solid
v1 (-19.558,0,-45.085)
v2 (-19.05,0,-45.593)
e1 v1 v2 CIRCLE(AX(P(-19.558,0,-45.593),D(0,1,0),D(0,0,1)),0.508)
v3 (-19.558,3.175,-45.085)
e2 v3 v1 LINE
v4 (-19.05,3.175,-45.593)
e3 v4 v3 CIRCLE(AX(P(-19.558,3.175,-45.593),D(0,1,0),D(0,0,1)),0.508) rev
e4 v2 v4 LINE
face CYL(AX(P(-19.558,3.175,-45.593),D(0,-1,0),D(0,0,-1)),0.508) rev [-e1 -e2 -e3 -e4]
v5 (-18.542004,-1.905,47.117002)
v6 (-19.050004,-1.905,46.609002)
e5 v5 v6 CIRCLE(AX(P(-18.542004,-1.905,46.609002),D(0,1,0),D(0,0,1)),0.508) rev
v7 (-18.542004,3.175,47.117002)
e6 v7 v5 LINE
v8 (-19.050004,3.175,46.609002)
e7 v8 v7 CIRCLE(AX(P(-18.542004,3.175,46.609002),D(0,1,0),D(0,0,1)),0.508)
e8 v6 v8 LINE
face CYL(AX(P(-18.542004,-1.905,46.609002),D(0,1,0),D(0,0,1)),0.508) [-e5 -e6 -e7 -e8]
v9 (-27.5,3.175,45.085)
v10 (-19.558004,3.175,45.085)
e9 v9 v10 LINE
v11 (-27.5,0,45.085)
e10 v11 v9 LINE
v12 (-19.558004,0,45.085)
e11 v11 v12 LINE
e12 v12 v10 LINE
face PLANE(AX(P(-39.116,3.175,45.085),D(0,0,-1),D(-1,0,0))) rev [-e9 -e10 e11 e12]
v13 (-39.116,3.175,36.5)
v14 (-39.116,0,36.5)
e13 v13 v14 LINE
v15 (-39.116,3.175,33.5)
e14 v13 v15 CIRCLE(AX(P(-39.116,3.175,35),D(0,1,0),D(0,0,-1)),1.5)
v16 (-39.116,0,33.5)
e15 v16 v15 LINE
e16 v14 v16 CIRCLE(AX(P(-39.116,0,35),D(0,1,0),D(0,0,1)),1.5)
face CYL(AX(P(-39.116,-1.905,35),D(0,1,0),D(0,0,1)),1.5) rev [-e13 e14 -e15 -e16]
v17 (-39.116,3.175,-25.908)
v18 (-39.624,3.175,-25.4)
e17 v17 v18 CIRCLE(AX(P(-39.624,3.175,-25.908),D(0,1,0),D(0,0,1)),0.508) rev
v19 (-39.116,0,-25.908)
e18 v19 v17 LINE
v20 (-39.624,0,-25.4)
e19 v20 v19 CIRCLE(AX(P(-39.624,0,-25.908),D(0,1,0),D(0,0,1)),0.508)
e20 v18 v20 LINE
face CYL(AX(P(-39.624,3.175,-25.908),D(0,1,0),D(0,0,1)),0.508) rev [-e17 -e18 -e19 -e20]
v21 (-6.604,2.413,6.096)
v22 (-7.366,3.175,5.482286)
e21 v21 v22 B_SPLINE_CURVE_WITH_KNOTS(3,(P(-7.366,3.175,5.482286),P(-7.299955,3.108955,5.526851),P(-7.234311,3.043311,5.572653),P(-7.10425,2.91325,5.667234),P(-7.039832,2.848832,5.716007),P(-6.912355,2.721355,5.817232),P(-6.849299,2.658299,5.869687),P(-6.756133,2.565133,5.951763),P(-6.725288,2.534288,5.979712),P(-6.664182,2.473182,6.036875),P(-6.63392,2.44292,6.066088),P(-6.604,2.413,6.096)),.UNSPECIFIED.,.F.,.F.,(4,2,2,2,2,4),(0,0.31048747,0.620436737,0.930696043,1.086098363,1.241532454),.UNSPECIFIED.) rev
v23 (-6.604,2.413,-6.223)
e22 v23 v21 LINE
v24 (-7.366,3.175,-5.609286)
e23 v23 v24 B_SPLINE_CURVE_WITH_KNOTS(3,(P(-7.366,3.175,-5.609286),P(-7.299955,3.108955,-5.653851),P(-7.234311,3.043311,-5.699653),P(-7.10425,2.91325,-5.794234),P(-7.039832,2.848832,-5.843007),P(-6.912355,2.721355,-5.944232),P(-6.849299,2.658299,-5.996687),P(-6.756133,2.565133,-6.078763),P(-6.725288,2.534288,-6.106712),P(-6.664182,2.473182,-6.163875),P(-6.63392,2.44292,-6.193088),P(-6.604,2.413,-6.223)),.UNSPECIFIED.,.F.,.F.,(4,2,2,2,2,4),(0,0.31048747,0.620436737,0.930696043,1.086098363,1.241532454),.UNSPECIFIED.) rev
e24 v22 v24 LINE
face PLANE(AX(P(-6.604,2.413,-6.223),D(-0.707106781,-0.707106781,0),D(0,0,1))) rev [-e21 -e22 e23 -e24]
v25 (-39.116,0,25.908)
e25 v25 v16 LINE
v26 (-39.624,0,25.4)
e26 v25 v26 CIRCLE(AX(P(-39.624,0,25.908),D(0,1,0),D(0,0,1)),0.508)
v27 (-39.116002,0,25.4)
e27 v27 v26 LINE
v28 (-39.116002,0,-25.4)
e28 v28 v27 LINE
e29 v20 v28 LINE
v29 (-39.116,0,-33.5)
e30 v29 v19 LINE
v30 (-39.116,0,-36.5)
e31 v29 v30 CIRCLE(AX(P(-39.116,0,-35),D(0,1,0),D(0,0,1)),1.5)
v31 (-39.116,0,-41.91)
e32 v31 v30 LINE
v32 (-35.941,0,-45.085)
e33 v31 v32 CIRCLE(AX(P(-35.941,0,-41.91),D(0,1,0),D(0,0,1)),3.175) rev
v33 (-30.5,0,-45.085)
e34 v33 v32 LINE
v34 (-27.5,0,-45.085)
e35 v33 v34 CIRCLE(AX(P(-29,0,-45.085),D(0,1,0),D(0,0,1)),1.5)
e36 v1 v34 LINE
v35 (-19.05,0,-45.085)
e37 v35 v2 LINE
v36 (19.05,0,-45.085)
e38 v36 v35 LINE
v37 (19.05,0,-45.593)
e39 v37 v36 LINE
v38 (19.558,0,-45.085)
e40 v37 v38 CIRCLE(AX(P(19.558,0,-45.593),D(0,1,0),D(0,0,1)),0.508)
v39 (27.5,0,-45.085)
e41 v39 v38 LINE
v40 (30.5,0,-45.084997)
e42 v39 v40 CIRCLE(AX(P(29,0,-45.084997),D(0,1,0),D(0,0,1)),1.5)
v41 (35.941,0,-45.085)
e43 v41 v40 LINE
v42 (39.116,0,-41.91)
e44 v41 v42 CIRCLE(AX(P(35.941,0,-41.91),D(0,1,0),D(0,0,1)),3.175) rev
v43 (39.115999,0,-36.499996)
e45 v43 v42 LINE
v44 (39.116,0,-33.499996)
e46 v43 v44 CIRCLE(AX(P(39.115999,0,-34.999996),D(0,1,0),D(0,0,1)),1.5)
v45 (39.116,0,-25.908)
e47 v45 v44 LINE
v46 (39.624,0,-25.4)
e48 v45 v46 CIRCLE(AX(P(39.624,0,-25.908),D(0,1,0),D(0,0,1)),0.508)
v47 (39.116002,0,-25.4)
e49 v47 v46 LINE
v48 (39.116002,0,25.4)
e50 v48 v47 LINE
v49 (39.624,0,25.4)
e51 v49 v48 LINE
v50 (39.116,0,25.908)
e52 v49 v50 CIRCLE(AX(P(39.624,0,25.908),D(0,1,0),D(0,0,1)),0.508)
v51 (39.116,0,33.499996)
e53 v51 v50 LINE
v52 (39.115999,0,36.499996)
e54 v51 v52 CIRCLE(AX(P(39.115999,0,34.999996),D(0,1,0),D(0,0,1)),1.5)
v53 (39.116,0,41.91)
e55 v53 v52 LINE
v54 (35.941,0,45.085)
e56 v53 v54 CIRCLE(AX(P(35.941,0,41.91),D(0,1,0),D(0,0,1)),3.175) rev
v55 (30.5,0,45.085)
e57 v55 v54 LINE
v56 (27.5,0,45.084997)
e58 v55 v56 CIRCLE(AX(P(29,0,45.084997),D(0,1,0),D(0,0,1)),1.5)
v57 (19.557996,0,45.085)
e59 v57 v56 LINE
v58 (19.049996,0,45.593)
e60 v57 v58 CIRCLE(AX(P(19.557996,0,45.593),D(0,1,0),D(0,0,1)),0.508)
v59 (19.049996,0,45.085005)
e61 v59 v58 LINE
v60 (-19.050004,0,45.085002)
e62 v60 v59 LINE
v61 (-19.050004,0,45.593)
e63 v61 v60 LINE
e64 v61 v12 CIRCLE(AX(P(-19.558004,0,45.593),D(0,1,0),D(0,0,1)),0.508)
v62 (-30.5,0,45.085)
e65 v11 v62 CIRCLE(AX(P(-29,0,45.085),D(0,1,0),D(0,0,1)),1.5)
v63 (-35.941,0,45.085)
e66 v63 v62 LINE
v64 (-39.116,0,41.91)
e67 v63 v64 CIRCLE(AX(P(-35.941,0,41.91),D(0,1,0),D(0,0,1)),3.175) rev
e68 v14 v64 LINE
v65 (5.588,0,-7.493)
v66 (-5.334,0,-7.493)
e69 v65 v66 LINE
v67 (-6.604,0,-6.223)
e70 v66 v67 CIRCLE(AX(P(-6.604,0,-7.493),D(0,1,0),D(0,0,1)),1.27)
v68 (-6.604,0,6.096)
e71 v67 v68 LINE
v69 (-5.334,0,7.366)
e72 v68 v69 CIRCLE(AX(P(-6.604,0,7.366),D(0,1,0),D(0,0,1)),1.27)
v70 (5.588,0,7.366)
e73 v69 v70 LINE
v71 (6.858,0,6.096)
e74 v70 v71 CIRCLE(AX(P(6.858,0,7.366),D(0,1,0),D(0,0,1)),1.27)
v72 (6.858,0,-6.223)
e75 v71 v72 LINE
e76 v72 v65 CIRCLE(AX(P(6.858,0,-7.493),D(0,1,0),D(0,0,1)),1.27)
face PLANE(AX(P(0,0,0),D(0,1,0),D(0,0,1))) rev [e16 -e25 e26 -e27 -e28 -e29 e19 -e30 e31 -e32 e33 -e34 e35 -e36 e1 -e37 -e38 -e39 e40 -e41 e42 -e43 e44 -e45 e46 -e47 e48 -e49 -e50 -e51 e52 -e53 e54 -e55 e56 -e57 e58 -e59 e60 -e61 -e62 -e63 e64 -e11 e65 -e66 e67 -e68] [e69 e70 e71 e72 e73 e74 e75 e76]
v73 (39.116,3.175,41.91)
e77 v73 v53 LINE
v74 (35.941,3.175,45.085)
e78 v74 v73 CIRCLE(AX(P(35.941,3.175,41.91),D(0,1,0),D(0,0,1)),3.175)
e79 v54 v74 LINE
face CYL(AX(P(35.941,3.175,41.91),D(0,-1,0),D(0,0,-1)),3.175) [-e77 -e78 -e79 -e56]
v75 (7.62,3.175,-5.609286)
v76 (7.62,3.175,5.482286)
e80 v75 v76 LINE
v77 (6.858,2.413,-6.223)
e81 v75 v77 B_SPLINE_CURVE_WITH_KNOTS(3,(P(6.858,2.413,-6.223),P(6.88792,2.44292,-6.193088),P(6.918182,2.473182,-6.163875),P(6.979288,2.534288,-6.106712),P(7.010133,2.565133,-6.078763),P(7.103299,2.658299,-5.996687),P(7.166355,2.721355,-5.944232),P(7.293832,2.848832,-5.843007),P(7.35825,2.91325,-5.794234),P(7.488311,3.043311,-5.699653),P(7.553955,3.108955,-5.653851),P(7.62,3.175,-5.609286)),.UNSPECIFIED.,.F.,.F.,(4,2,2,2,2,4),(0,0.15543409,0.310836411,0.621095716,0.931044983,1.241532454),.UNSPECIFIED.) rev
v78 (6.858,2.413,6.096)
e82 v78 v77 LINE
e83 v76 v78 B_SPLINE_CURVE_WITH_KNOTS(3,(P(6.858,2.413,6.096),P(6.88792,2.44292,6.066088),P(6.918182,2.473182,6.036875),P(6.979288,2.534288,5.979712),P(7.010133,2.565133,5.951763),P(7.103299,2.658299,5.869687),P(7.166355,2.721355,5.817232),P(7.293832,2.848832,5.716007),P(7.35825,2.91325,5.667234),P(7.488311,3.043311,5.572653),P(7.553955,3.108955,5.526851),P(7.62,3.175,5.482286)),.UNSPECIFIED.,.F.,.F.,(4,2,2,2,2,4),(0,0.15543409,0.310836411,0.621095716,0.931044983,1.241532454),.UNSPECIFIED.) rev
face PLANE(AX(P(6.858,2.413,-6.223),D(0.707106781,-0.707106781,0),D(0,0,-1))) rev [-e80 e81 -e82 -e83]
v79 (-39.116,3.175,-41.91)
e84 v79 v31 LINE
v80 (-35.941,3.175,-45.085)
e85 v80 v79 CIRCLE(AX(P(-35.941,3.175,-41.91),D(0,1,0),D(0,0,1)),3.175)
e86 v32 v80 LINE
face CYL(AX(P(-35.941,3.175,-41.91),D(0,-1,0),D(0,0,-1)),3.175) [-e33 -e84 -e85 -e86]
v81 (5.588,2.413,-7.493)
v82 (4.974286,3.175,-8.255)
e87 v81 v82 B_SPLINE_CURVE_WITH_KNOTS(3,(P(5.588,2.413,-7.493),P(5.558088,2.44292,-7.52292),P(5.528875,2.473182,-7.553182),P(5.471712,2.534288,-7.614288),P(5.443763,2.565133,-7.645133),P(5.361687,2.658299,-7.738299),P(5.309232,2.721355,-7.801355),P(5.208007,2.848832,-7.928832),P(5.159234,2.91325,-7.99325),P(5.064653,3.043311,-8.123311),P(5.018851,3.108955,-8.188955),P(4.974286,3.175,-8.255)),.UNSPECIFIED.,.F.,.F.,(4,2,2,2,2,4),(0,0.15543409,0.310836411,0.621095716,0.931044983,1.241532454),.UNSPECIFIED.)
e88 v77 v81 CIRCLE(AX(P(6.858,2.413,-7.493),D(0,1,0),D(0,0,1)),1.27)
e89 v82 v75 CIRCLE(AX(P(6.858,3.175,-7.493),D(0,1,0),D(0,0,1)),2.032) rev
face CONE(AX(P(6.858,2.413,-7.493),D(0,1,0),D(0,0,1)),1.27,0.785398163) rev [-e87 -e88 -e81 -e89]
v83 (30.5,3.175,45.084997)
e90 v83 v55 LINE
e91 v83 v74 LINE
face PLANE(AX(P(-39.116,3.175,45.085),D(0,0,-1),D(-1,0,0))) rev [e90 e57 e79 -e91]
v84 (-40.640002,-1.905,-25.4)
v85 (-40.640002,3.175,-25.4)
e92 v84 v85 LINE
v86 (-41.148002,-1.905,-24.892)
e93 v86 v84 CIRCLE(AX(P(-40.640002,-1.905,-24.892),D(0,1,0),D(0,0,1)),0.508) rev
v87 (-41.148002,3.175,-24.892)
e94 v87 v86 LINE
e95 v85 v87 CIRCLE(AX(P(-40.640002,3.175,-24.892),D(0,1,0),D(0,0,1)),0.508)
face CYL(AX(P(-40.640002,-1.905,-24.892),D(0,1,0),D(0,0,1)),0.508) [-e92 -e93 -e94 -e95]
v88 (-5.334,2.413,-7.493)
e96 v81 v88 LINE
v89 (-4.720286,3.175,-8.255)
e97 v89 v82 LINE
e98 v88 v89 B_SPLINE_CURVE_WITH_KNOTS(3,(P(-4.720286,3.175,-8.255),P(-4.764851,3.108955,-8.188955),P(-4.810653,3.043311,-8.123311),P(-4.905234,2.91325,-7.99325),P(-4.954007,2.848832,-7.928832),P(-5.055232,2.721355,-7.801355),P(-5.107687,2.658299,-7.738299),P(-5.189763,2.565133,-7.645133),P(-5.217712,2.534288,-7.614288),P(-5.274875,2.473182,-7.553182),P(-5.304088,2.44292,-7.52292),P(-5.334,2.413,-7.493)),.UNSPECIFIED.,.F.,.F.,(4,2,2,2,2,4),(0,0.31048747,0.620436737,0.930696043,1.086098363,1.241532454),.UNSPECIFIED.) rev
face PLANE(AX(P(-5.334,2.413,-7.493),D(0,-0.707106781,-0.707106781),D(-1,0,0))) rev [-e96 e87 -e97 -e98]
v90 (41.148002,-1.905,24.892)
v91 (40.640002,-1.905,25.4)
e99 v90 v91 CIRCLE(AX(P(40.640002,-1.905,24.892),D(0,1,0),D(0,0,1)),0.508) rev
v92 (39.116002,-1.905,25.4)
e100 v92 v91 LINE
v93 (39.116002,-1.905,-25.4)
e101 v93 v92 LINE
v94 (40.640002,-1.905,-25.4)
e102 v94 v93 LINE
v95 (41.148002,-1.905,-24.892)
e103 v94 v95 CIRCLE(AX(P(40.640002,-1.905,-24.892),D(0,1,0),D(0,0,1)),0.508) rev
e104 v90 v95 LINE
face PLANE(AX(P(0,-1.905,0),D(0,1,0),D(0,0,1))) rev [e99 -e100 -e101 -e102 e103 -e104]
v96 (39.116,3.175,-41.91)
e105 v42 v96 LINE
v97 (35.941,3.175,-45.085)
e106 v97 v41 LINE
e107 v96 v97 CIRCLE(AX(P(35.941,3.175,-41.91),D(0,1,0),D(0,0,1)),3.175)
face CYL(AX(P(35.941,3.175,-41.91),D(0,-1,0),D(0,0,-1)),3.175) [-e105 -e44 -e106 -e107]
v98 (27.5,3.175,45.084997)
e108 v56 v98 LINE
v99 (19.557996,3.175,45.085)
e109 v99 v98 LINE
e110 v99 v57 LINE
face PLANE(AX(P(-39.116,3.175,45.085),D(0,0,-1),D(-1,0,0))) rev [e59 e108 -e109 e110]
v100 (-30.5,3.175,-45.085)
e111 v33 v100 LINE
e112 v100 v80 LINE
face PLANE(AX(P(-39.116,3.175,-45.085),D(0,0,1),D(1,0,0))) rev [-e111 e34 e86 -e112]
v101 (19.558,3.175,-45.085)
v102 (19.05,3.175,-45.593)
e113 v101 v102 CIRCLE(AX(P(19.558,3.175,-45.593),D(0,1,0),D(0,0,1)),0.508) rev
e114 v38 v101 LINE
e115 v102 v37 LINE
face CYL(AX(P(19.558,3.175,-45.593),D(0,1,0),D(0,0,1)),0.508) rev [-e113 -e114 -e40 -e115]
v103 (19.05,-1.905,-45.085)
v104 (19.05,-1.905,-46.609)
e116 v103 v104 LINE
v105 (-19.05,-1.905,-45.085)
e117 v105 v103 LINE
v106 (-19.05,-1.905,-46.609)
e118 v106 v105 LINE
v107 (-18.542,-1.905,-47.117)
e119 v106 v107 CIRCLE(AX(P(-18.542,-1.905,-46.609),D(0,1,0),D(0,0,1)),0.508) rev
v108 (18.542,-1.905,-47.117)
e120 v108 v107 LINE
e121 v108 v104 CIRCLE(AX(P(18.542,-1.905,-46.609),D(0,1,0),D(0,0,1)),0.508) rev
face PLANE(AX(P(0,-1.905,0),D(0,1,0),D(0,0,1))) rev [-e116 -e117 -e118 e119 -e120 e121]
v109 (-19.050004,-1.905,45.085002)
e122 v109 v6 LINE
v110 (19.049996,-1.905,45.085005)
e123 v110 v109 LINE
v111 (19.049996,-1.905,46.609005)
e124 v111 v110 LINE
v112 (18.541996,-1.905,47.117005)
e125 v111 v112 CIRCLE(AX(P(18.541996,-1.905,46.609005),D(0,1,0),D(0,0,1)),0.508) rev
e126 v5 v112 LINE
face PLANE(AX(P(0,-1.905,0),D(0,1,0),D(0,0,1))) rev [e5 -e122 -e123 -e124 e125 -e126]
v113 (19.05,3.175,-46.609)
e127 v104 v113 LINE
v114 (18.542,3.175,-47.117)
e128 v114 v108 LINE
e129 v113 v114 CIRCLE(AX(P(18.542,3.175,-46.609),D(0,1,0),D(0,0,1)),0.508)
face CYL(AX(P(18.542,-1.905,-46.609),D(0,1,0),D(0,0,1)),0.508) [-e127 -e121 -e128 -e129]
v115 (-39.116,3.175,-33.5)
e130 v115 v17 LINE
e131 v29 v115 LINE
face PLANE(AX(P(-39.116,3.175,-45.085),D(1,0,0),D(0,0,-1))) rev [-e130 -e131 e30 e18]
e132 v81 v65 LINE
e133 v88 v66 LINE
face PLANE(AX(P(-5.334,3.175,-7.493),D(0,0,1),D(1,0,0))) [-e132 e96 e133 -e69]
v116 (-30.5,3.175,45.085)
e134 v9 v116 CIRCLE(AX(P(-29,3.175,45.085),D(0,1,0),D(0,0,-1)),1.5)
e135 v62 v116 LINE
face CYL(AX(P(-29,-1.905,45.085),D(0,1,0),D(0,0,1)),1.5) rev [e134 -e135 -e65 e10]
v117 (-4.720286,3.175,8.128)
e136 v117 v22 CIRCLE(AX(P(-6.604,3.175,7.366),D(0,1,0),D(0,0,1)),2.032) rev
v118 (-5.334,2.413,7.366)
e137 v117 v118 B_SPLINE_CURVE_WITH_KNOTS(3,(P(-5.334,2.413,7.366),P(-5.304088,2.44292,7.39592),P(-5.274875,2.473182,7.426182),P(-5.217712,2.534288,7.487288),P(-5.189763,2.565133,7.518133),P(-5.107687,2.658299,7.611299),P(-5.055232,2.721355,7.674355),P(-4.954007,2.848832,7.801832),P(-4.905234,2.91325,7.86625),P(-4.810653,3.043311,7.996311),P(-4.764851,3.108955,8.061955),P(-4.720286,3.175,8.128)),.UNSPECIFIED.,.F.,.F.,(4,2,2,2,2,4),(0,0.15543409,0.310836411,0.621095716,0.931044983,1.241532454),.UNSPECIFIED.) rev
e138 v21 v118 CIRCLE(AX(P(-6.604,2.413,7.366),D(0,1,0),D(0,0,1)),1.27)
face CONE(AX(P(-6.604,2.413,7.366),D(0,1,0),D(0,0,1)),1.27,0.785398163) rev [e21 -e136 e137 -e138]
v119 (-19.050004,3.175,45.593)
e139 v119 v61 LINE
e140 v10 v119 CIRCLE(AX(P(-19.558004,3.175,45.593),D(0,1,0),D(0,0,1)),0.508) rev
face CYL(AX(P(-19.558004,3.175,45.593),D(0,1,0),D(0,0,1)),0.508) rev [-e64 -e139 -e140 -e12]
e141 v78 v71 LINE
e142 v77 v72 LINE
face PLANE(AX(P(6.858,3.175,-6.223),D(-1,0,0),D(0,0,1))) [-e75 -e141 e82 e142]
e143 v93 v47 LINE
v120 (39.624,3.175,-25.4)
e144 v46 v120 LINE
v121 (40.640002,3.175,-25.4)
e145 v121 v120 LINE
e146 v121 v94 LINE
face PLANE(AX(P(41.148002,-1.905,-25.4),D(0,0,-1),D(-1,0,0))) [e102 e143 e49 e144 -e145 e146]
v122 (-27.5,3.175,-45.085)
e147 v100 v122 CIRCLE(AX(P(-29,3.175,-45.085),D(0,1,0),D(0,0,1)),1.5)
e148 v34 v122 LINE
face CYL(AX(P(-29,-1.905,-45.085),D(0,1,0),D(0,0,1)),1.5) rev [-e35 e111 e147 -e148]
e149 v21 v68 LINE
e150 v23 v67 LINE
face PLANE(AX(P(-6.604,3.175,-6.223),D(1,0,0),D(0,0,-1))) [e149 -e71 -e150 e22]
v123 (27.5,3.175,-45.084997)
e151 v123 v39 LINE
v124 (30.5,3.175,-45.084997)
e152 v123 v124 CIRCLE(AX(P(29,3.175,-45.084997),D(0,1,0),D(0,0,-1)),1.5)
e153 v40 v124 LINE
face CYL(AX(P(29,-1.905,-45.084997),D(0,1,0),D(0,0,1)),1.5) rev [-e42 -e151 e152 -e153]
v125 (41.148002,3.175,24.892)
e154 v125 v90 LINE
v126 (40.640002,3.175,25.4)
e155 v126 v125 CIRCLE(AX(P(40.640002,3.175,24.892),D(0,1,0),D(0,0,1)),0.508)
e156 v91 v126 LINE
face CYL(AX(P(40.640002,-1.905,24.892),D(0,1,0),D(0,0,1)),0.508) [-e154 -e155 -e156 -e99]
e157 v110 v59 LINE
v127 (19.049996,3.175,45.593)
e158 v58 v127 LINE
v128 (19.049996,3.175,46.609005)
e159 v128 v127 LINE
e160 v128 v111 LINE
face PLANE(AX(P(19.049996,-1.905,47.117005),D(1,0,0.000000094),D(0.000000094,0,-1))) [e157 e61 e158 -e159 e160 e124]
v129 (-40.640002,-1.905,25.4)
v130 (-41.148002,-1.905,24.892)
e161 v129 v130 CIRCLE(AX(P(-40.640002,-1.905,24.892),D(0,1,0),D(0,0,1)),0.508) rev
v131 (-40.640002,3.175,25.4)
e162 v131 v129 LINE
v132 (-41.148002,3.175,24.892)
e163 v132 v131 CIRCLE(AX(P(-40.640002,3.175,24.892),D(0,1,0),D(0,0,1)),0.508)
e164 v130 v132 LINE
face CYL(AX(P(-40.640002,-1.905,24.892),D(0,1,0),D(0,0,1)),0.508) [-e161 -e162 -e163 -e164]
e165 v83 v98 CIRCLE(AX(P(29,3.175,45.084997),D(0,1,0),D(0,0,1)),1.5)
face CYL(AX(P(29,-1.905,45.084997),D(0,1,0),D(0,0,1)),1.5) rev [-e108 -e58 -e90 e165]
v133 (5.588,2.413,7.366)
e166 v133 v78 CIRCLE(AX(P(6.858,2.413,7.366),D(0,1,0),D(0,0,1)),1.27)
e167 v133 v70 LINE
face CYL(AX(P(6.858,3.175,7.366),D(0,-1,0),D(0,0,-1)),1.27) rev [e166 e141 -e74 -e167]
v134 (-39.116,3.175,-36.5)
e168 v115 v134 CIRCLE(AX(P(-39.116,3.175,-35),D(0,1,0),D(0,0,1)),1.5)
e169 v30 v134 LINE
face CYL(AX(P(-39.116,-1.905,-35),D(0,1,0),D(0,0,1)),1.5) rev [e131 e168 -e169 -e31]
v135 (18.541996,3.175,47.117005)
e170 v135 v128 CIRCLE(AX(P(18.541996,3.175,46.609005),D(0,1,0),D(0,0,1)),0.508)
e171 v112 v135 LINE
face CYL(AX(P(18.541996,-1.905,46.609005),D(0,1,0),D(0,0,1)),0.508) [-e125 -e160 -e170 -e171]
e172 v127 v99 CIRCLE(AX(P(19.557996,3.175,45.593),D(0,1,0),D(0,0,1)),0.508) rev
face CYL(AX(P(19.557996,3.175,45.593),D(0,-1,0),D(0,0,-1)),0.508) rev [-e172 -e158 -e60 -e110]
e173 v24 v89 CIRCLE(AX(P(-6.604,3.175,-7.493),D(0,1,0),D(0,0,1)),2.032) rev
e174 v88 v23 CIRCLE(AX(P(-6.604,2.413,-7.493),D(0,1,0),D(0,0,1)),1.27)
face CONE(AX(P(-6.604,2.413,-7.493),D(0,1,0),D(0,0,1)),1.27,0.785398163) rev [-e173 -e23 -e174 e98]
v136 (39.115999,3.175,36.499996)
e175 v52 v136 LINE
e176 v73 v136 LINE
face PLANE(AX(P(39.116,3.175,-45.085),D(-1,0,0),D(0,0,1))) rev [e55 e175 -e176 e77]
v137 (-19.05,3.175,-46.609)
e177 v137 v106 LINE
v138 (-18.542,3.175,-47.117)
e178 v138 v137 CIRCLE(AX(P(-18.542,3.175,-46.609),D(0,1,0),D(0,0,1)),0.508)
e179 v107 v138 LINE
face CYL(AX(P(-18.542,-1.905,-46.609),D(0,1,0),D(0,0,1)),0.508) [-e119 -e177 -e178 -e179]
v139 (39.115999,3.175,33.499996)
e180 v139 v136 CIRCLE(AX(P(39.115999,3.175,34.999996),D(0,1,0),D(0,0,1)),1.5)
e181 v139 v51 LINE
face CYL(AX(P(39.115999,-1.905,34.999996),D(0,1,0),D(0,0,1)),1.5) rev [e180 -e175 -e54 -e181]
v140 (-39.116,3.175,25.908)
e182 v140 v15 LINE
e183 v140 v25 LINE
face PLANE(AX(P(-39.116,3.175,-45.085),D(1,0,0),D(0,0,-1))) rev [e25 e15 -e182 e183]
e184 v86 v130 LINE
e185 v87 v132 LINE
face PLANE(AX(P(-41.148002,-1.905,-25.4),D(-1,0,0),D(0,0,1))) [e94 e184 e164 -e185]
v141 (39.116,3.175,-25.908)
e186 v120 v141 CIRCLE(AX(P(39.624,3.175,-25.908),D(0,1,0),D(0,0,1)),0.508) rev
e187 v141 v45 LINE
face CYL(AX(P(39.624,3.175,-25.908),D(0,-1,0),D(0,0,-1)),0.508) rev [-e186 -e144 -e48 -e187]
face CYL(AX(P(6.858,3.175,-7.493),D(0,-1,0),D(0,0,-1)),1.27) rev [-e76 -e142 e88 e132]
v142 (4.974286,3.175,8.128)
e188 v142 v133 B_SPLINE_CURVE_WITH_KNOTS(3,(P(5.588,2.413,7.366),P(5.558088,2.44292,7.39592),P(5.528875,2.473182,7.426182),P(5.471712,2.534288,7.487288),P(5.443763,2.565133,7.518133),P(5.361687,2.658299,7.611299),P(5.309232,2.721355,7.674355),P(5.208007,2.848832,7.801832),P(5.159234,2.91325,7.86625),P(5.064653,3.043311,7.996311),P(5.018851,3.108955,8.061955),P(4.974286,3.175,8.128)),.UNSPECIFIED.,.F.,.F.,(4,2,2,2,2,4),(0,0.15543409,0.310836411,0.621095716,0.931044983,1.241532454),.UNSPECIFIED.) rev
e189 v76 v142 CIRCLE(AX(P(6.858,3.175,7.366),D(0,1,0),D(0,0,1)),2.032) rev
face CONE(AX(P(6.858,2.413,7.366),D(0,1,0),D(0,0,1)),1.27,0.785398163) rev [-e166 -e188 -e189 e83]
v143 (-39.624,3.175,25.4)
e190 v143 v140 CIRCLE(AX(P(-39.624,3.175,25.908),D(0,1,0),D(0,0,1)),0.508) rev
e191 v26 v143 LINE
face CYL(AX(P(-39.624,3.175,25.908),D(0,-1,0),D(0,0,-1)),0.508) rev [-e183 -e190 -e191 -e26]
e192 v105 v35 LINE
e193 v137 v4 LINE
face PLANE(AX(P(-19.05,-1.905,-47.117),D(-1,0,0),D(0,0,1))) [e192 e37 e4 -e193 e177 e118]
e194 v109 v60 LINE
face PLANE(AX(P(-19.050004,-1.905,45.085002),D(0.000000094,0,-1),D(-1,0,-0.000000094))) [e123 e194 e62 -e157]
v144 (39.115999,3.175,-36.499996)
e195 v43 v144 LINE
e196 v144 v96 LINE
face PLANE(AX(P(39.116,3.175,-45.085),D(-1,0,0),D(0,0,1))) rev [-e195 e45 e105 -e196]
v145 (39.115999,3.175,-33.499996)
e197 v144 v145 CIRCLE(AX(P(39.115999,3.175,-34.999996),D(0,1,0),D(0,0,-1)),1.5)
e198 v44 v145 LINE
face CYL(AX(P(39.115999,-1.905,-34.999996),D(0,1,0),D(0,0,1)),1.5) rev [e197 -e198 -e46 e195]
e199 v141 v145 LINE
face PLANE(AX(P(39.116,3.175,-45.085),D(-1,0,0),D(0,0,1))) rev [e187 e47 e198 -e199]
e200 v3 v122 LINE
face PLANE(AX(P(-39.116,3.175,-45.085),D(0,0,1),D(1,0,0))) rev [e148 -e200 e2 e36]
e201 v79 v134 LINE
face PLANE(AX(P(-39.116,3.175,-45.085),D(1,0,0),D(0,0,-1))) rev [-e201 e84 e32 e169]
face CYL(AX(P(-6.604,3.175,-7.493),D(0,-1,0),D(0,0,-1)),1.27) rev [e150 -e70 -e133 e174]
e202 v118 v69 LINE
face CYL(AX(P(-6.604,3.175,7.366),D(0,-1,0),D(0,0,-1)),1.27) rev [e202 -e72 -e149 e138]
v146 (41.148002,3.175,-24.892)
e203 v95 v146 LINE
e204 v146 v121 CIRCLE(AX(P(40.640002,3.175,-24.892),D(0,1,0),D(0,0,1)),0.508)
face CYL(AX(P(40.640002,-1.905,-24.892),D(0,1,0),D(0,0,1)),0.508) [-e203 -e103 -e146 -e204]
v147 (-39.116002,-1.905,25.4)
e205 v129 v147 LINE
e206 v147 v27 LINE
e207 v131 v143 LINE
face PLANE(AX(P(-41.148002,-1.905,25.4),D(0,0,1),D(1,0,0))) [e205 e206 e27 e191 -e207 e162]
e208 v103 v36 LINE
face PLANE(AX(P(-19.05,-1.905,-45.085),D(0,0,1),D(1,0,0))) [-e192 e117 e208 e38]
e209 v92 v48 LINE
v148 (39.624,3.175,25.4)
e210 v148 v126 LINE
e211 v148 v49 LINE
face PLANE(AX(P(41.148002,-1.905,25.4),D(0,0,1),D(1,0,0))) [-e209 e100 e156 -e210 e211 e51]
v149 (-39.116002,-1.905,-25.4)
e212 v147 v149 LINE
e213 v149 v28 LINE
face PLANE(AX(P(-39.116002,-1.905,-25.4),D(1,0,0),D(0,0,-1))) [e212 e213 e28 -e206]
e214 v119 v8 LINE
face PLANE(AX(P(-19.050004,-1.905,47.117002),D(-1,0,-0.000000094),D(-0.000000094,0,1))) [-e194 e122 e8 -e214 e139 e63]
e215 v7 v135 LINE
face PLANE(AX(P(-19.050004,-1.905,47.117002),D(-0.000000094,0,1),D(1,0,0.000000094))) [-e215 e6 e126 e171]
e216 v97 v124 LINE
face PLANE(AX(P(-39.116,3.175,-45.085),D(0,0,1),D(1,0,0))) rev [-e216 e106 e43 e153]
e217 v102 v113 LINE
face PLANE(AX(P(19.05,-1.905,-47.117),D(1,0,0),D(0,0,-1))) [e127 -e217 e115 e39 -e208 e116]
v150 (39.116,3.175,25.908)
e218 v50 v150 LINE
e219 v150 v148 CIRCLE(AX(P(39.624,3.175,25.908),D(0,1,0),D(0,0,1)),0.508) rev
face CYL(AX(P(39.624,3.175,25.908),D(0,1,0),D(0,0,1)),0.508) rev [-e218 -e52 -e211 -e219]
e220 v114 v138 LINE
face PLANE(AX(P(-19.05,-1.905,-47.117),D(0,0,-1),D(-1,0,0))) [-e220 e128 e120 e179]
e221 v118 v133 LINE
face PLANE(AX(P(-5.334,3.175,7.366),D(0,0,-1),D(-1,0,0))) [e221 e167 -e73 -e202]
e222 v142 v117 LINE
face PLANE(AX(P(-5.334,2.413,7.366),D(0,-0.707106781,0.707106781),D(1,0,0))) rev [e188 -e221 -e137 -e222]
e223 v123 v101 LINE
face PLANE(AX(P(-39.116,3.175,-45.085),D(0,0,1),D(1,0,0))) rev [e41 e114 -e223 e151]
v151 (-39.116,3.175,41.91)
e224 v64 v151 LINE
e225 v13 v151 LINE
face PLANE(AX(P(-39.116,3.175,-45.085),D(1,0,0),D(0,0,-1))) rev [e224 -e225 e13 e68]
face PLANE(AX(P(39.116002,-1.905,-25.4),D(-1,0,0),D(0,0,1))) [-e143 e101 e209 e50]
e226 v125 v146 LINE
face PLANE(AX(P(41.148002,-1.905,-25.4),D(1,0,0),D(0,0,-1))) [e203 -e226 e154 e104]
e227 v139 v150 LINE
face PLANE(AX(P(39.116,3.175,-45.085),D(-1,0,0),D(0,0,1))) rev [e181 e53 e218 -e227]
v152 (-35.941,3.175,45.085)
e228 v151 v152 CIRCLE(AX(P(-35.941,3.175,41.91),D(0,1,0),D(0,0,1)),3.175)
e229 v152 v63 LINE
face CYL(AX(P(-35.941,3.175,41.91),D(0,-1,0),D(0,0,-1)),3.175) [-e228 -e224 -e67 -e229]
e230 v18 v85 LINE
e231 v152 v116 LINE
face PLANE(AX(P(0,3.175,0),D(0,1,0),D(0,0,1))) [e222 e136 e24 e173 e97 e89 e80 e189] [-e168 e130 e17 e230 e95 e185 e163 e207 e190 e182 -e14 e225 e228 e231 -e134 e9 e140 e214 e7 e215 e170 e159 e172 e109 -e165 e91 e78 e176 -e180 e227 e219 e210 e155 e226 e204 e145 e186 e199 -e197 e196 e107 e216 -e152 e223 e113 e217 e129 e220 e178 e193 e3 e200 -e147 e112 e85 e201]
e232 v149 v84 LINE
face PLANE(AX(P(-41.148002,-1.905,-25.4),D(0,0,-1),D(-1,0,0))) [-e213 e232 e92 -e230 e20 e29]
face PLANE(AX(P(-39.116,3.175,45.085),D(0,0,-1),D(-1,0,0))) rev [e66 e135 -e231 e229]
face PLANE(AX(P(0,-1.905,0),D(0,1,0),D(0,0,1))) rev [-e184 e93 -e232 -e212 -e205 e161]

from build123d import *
from OCP.BRepAlgoAPI import BRepAlgoAPI_Cut
from OCP.TopTools import TopTools_ListOfShape

# Parameters (mm, degrees)
SKETCH1_W           = 78.232
SKETCH1_H           = 90.17
BOSS_EXTRUDE1_DEPTH = 3.175
FILLET1_R           = 3.175
SKETCH2_W           = 2.032
SKETCH2_H           = 50.8
SKETCH2_W_2         = 38.1
SKETCH2_H_2         = 2.032
BOSS_EXTRUDE2_DEPTH = 5.08
FILLET3_R           = 0.508
CUT_EXTRUDE1_DEPTH  = 63.761267046
CHAMFER2_SIZE       = 0.762


with BuildPart() as part:
    # Sketch1 → Boss-Extrude1 (new body)
    with BuildSketch(Plane(origin=(0, 0, 0), x_dir=(1, 0, 0), z_dir=(0, 1, 0))):
        Rectangle(SKETCH1_W, SKETCH1_H)
        with BuildLine():
            Line((-5.334, 7.493), (5.588, 7.493))
            ThreePointArc((5.588, 7.493), (7.756025612, 8.391025612), (6.858, 6.223))
            Line((6.858, 6.223), (6.858, -6.096))
            ThreePointArc((6.858, -6.096), (7.756025612, -8.264025612), (5.588, -7.366))
            Line((5.588, -7.366), (-5.334, -7.366))
            ThreePointArc((-5.334, -7.366), (-7.502025612, -8.264025612), (-6.604, -6.096))
            Line((-6.604, -6.096), (-6.604, 6.223))
            ThreePointArc((-6.604, 6.223), (-7.502025612, 8.391025612), (-5.334, 7.493))
        make_face(mode=Mode.SUBTRACT)
    extrude(amount=BOSS_EXTRUDE1_DEPTH)

    # Fillet1
    fillet1_edges = [part.edges().sort_by_distance(p)[0] for p in [
        (-39.116, 1.5875, -45.085),
        (39.116, 1.5875, -45.085),
        (39.116, 1.5875, 45.085),
        (-39.116, 1.5875, 45.085),
    ]]
    fillet(fillet1_edges, radius=FILLET1_R)


with BuildPart() as boss_extrude2_tool:
    # Sketch2 → Boss-Extrude2 (new body)
    with BuildSketch(Plane(origin=(0, 3.175, 0), x_dir=(1, 0, 0), z_dir=(0, 1, 0))):
        Polygon((19.049995564, -47.117005476), (19.049995755, -45.085005476), (-19.050004245, -45.085001889), (-19.050004436, -47.117001889), align=None)
        with Locations((-40.132001661, 0)):
            Rectangle(SKETCH2_W, SKETCH2_H)
        with Locations((0, 46.101)):
            Rectangle(SKETCH2_W_2, SKETCH2_H_2)
        with Locations((40.132001661, 0)):
            Rectangle(SKETCH2_W, SKETCH2_H)
    extrude(amount=-BOSS_EXTRUDE2_DEPTH)


with BuildPart() as part_1:
    add(part.part)


with BuildPart() as part_2:
    # Boss-Extrude2: joined with boss_extrude2_tool
    add(part_1.part.fuse(boss_extrude2_tool.part, tol=0.00001))

    # Fillet3
    fillet3_edges = [part_2.edges().sort_by_distance(p)[0] for p in [
        (19.05, 1.5875, -45.085),
        (-19.05, 1.5875, -45.085),
        (-19.05, 0.635, -47.117),
        (19.05, 0.635, -47.117),
        (-39.116001661, 1.5875, 25.4),
        (-39.116001661, 1.5875, -25.4),
        (-41.148001661, 0.635, 25.4),
        (-41.148001661, 0.635, -25.4),
        (39.116001661, 1.5875, 25.4),
        (39.116001661, 1.5875, -25.4),
        (41.148001661, 0.635, -25.4),
        (41.148001661, 0.635, 25.4),
        (19.049995755, 1.5875, 45.085005476),
        (-19.050004245, 1.5875, 45.085001889),
        (19.049995564, 0.635, 47.117005476),
        (-19.050004436, 0.635, 47.117001889),
    ]]
    fillet(fillet3_edges, radius=FILLET3_R)


with BuildPart() as cut_extrude1_tool:
    # Sketch3 → Cut-Extrude1 (new, through all)
    with BuildSketch(Plane(origin=(0, 3.175, 0), x_dir=(1, 0, 0), z_dir=(0, 1, 0))):
        with BuildLine():
            Line((-39.116, 36.5), (-39.116, 33.5))
            ThreePointArc((-39.116, 33.5), (-37.616, 35), (-39.116, 36.5))
        make_face()
        with BuildLine():
            Line((-27.5, 45.085), (-30.5, 45.085))
            ThreePointArc((-30.5, 45.085), (-29, 43.585), (-27.5, 45.085))
        make_face()
        with BuildLine():
            Line((27.499999809, 45.084997268), (30.499999809, 45.084997268))
            ThreePointArc((30.499999809, 45.084997268), (28.999999809, 43.584997268), (27.499999809, 45.084997268))
        make_face()
        with BuildLine():
            Line((39.115998859, 36.499996315), (39.115998859, 33.499996315))
            ThreePointArc((39.115998859, 33.499996315), (37.615998859, 34.999996315), (39.115998859, 36.499996315))
        make_face()
        with BuildLine():
            Line((39.115998859, -33.499996315), (39.115998859, -36.499996315))
            ThreePointArc((39.115998859, -36.499996315), (37.615998859, -34.999996315), (39.115998859, -33.499996315))
        make_face()
        with BuildLine():
            Line((30.499999809, -45.084997268), (27.499999809, -45.084997268))
            ThreePointArc((27.499999809, -45.084997268), (28.999999809, -43.584997268), (30.499999809, -45.084997268))
        make_face()
        with BuildLine():
            Line((-27.5, -45.085), (-30.5, -45.085))
            ThreePointArc((-30.5, -45.085), (-29, -43.585), (-27.5, -45.085))
        make_face()
        with BuildLine():
            Line((-39.116, -36.5), (-39.116, -33.5))
            ThreePointArc((-39.116, -33.5), (-37.616, -35), (-39.116, -36.5))
        make_face()
    extrude(amount=-CUT_EXTRUDE1_DEPTH)


with BuildPart() as part_3:
    add(part_2.part)

    # Cut-Extrude1: cut by cut_extrude1_tool, with a tolerance
    cut_extrude1_stock = TopTools_ListOfShape()
    cut_extrude1_stock.Append(part_3.part.wrapped)
    cut_extrude1_tools = TopTools_ListOfShape()
    cut_extrude1_tools.Append(cut_extrude1_tool.part.wrapped)
    cut_extrude1_cut = BRepAlgoAPI_Cut()
    cut_extrude1_cut.SetArguments(cut_extrude1_stock)
    cut_extrude1_cut.SetTools(cut_extrude1_tools)
    cut_extrude1_cut.SetFuzzyValue(0.00001)
    cut_extrude1_cut.Build()
    add(Compound.cast(cut_extrude1_cut.Shape()).solids(), mode=Mode.REPLACE)

    # Chamfer2
    chamfer2_edges = [part_3.edges().sort_by_distance(p)[0] for p in [
        (-7.502025612, 3.175, -8.391025612),
        (-6.604, 3.175, -0.0635),
        (-7.502025612, 3.175, 8.264025612),
        (0.127, 3.175, 7.366),
        (7.756025612, 3.175, 8.264025612),
        (6.858, 3.175, -0.0635),
        (7.756025612, 3.175, -8.391025612),
        (0.127, 3.175, -7.493),
    ]]
    chamfer(chamfer2_edges, length=CHAMFER2_SIZE)


solid = part_3.part
